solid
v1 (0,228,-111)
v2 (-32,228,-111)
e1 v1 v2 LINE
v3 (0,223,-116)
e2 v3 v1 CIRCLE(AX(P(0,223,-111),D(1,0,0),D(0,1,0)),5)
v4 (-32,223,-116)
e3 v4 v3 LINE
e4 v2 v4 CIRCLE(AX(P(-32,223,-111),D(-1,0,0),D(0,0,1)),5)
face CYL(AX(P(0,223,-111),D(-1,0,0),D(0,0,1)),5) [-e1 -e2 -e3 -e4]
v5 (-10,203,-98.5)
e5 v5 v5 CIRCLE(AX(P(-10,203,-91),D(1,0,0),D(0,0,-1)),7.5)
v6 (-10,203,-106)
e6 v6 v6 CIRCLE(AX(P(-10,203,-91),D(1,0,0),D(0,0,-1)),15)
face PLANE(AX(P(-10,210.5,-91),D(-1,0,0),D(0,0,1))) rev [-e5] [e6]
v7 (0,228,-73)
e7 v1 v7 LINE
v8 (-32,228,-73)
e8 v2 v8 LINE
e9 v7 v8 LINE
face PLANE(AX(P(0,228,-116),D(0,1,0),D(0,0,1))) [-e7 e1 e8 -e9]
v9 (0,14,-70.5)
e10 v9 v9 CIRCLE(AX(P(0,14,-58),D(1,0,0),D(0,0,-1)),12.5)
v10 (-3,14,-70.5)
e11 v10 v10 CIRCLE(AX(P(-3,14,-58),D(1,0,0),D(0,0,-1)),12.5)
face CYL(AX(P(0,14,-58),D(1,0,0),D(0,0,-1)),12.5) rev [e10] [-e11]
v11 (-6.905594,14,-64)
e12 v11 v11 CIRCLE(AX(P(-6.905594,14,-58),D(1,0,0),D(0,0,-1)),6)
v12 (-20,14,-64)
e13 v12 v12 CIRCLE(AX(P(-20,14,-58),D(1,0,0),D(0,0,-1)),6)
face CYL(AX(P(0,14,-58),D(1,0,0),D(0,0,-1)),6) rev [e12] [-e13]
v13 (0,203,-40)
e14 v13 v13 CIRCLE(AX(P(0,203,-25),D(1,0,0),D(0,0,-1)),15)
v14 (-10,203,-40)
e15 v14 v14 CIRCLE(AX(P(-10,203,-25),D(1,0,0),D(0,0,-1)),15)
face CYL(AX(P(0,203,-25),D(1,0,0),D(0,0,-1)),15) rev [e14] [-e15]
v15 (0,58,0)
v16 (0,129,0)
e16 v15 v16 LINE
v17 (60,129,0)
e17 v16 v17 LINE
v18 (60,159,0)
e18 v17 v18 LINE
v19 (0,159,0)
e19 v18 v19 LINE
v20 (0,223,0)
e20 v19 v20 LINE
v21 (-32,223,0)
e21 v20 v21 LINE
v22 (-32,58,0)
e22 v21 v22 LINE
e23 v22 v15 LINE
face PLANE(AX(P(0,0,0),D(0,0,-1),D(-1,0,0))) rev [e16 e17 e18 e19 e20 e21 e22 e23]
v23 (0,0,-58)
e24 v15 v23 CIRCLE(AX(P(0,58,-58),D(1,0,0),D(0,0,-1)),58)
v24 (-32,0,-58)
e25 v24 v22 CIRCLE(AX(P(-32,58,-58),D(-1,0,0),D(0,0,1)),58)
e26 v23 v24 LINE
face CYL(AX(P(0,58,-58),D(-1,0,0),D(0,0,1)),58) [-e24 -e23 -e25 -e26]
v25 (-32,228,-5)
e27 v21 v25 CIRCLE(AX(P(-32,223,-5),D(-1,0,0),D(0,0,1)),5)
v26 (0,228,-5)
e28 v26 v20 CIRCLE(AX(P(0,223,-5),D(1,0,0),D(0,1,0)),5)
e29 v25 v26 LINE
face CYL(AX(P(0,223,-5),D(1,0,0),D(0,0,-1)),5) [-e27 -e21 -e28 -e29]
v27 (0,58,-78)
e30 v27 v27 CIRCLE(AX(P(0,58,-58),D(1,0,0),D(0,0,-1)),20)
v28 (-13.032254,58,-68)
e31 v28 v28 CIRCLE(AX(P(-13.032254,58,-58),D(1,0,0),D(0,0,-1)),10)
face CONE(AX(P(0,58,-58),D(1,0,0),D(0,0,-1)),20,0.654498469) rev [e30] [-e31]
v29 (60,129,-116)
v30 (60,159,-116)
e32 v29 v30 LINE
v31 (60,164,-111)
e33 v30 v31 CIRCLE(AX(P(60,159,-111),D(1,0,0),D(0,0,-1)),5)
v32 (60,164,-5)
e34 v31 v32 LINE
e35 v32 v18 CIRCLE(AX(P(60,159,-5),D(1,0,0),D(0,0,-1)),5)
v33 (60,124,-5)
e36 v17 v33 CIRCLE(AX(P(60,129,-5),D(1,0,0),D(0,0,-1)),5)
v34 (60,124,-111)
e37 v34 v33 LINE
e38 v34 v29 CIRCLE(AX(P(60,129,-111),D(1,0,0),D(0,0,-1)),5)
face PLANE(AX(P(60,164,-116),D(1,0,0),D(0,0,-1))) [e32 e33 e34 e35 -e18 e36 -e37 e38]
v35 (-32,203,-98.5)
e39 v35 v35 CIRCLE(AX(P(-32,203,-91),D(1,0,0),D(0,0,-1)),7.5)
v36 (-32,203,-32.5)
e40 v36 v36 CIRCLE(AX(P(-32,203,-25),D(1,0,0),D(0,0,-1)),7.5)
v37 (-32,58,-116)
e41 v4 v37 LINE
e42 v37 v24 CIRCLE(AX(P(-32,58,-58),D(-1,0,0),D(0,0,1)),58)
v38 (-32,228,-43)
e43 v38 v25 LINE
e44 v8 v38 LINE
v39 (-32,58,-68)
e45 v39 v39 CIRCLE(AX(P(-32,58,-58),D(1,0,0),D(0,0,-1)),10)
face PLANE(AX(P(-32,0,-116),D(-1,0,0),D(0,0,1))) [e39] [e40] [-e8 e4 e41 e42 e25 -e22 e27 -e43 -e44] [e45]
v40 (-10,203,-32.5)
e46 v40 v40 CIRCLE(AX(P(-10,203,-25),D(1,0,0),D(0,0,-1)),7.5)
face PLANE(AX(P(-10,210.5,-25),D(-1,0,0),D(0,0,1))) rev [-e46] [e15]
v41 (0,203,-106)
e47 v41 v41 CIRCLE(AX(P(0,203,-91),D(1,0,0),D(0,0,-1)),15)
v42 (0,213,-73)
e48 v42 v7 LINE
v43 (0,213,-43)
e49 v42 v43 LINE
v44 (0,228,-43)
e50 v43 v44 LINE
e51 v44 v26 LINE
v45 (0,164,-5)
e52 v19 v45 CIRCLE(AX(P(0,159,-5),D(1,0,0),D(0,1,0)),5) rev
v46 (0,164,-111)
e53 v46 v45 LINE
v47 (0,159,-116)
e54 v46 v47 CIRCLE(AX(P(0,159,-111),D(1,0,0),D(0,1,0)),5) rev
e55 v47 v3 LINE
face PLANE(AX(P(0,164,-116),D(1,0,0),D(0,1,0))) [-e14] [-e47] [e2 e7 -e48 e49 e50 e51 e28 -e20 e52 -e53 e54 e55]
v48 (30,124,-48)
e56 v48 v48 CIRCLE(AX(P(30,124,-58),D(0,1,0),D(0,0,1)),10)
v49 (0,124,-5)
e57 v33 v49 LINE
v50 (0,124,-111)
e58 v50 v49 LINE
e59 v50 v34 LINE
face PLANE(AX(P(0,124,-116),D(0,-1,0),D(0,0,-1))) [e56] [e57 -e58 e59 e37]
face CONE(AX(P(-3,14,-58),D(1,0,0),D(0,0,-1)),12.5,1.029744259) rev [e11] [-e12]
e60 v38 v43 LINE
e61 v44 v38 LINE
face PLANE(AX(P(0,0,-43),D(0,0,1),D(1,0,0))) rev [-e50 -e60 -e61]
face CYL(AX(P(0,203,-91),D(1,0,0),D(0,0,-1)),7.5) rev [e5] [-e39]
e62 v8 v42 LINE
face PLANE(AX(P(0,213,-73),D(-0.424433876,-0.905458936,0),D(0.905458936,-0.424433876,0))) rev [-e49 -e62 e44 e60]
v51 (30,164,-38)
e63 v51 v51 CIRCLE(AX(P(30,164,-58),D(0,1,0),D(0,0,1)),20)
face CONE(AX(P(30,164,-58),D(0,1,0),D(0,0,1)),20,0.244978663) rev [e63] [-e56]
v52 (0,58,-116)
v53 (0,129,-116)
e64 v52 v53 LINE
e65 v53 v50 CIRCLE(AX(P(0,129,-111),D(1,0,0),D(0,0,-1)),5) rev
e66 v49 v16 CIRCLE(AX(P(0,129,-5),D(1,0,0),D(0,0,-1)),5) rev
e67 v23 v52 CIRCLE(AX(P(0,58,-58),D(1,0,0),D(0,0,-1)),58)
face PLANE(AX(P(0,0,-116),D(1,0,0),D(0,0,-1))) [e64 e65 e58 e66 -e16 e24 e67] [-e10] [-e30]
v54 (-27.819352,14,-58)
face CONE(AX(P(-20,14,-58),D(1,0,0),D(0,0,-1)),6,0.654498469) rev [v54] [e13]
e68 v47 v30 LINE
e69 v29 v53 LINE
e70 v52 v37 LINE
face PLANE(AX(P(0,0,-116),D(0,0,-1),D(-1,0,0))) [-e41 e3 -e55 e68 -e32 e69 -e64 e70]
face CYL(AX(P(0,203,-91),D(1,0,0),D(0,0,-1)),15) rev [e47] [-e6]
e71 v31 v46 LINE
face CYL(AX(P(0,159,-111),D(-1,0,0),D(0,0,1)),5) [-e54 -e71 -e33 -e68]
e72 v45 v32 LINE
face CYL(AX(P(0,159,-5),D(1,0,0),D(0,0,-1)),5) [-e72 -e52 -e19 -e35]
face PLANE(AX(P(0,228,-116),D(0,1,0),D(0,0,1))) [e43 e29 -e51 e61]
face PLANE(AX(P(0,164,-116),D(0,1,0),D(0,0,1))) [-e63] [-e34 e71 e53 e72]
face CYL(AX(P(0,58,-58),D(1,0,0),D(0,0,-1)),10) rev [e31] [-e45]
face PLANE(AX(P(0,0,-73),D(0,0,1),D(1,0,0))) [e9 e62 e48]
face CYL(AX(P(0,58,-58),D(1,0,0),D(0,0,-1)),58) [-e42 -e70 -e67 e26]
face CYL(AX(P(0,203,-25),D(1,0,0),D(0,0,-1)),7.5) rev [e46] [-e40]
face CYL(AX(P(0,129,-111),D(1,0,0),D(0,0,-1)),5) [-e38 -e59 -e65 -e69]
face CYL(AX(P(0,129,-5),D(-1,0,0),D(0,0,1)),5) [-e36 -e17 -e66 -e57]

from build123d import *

# Parameters (mm, degrees)
SALIENTE_EXTRUIR3_DEPTH                              = 116
REDONDEO1_R                                          = 5
REDONDEO2_R                                          = 58
REFRENTADO_PARA_TORNILLO_CON_CABEZA_PLAN_D           = 15
REFRENTADO_PARA_TORNILLO_CON_CABEZA_PLAN_CBORE_D     = 30
REFRENTADO_PARA_TORNILLO_CON_CABEZA_PLAN_CBORE_DEPTH = 10
AVELLANADO_PARA_TORNILLO_CON_CABEZA_PLAN_D           = 20
AVELLANADO_PARA_TORNILLO_CON_CABEZA_PLAN_CSINK_D     = 40
AVELLANADO_PARA_TORNILLO_CON_CABEZA_PLAN_CSINK_ANGLE = 75
CORTAR_EXTRUIR1_DEPTH                                = 15


with BuildPart() as part:
    # Croquis1 → Saliente-Extruir3 (new body)
    with BuildSketch(Plane.XY):
        Polygon((0, 164), (0, 228), (-32, 228), (-32, 0), (0, 0), (0, 124), (60, 124), (60, 164), align=None)
    extrude(amount=-SALIENTE_EXTRUIR3_DEPTH)

    # Redondeo1
    redondeo1_edges = [part.edges().sort_by_distance(p)[0] for p in [
        (30, 164, 0),
        (30, 124, 0),
        (30, 164, -116),
        (-16, 228, -116),
        (30, 124, -116),
        (-16, 228, 0),
    ]]
    fillet(redondeo1_edges, radius=REDONDEO1_R)

    # Redondeo2
    redondeo2_edges = [part.edges().sort_by_distance(p)[0] for p in [
        (-16, 0, -116),
        (-16, 0, 0),
    ]]
    fillet(redondeo2_edges, radius=REDONDEO2_R - 0.0001)  # a hair under: the kernel refuses the full size

    # Refrentado para tornillo con cabeza plana de M51 (through all)
    with Locations(Plane(origin=(0, 203, -25), x_dir=(0, 0, 1), z_dir=(1, 0, 0))):
        with Locations((0, 0), (-66, 0)):
            CounterBoreHole(REFRENTADO_PARA_TORNILLO_CON_CABEZA_PLAN_D / 2, REFRENTADO_PARA_TORNILLO_CON_CABEZA_PLAN_CBORE_D / 2, REFRENTADO_PARA_TORNILLO_CON_CABEZA_PLAN_CBORE_DEPTH)

    # Avellanado para tornillo con cabeza plana avellanada de M51 (through all)
    with Locations(Plane(origin=(0, 58, -58), x_dir=(0, 0, 1), z_dir=(1, 0, 0))):
        with Locations((0, 0)):
            CounterSinkHole(AVELLANADO_PARA_TORNILLO_CON_CABEZA_PLAN_D / 2, AVELLANADO_PARA_TORNILLO_CON_CABEZA_PLAN_CSINK_D / 2, counter_sink_angle=AVELLANADO_PARA_TORNILLO_CON_CABEZA_PLAN_CSINK_ANGLE)

    # Croquis6 → Taladro1 (revolve, cut)
    with BuildSketch(Plane(origin=(0, 14, -58), x_dir=(0, 0, -1), z_dir=(0, 1, 0))):
        Polygon((0, 0), (0, 27.819352237), (6, 20), (6, 6.905594024), (12.5, 3), (12.5, 0), align=None)
    revolve(axis=Axis((6.130023899, 14, -58), (-1, 0, 0)), mode=Mode.SUBTRACT)

    # Croquis9 → Taladro2 (revolve, cut)
    with BuildSketch(Plane(origin=(30, 164, -58), x_dir=(0, 0, 1), z_dir=(1, 0, 0))):
        Polygon((0, 0), (0, 40), (10, 40), (20, 0), align=None)
    revolve(axis=Axis((30, 54, -58), (0, 1, 0)), mode=Mode.SUBTRACT)

    # Croquis10 → Cortar-Extruir1 (cut, symmetric)
    with BuildSketch(Plane.XY.offset(-58)):
        Polygon((-32, 228), (0, 228), (0, 213), align=None)
    extrude(amount=CORTAR_EXTRUIR1_DEPTH, both=True, mode=Mode.SUBTRACT)


solid = part.part
